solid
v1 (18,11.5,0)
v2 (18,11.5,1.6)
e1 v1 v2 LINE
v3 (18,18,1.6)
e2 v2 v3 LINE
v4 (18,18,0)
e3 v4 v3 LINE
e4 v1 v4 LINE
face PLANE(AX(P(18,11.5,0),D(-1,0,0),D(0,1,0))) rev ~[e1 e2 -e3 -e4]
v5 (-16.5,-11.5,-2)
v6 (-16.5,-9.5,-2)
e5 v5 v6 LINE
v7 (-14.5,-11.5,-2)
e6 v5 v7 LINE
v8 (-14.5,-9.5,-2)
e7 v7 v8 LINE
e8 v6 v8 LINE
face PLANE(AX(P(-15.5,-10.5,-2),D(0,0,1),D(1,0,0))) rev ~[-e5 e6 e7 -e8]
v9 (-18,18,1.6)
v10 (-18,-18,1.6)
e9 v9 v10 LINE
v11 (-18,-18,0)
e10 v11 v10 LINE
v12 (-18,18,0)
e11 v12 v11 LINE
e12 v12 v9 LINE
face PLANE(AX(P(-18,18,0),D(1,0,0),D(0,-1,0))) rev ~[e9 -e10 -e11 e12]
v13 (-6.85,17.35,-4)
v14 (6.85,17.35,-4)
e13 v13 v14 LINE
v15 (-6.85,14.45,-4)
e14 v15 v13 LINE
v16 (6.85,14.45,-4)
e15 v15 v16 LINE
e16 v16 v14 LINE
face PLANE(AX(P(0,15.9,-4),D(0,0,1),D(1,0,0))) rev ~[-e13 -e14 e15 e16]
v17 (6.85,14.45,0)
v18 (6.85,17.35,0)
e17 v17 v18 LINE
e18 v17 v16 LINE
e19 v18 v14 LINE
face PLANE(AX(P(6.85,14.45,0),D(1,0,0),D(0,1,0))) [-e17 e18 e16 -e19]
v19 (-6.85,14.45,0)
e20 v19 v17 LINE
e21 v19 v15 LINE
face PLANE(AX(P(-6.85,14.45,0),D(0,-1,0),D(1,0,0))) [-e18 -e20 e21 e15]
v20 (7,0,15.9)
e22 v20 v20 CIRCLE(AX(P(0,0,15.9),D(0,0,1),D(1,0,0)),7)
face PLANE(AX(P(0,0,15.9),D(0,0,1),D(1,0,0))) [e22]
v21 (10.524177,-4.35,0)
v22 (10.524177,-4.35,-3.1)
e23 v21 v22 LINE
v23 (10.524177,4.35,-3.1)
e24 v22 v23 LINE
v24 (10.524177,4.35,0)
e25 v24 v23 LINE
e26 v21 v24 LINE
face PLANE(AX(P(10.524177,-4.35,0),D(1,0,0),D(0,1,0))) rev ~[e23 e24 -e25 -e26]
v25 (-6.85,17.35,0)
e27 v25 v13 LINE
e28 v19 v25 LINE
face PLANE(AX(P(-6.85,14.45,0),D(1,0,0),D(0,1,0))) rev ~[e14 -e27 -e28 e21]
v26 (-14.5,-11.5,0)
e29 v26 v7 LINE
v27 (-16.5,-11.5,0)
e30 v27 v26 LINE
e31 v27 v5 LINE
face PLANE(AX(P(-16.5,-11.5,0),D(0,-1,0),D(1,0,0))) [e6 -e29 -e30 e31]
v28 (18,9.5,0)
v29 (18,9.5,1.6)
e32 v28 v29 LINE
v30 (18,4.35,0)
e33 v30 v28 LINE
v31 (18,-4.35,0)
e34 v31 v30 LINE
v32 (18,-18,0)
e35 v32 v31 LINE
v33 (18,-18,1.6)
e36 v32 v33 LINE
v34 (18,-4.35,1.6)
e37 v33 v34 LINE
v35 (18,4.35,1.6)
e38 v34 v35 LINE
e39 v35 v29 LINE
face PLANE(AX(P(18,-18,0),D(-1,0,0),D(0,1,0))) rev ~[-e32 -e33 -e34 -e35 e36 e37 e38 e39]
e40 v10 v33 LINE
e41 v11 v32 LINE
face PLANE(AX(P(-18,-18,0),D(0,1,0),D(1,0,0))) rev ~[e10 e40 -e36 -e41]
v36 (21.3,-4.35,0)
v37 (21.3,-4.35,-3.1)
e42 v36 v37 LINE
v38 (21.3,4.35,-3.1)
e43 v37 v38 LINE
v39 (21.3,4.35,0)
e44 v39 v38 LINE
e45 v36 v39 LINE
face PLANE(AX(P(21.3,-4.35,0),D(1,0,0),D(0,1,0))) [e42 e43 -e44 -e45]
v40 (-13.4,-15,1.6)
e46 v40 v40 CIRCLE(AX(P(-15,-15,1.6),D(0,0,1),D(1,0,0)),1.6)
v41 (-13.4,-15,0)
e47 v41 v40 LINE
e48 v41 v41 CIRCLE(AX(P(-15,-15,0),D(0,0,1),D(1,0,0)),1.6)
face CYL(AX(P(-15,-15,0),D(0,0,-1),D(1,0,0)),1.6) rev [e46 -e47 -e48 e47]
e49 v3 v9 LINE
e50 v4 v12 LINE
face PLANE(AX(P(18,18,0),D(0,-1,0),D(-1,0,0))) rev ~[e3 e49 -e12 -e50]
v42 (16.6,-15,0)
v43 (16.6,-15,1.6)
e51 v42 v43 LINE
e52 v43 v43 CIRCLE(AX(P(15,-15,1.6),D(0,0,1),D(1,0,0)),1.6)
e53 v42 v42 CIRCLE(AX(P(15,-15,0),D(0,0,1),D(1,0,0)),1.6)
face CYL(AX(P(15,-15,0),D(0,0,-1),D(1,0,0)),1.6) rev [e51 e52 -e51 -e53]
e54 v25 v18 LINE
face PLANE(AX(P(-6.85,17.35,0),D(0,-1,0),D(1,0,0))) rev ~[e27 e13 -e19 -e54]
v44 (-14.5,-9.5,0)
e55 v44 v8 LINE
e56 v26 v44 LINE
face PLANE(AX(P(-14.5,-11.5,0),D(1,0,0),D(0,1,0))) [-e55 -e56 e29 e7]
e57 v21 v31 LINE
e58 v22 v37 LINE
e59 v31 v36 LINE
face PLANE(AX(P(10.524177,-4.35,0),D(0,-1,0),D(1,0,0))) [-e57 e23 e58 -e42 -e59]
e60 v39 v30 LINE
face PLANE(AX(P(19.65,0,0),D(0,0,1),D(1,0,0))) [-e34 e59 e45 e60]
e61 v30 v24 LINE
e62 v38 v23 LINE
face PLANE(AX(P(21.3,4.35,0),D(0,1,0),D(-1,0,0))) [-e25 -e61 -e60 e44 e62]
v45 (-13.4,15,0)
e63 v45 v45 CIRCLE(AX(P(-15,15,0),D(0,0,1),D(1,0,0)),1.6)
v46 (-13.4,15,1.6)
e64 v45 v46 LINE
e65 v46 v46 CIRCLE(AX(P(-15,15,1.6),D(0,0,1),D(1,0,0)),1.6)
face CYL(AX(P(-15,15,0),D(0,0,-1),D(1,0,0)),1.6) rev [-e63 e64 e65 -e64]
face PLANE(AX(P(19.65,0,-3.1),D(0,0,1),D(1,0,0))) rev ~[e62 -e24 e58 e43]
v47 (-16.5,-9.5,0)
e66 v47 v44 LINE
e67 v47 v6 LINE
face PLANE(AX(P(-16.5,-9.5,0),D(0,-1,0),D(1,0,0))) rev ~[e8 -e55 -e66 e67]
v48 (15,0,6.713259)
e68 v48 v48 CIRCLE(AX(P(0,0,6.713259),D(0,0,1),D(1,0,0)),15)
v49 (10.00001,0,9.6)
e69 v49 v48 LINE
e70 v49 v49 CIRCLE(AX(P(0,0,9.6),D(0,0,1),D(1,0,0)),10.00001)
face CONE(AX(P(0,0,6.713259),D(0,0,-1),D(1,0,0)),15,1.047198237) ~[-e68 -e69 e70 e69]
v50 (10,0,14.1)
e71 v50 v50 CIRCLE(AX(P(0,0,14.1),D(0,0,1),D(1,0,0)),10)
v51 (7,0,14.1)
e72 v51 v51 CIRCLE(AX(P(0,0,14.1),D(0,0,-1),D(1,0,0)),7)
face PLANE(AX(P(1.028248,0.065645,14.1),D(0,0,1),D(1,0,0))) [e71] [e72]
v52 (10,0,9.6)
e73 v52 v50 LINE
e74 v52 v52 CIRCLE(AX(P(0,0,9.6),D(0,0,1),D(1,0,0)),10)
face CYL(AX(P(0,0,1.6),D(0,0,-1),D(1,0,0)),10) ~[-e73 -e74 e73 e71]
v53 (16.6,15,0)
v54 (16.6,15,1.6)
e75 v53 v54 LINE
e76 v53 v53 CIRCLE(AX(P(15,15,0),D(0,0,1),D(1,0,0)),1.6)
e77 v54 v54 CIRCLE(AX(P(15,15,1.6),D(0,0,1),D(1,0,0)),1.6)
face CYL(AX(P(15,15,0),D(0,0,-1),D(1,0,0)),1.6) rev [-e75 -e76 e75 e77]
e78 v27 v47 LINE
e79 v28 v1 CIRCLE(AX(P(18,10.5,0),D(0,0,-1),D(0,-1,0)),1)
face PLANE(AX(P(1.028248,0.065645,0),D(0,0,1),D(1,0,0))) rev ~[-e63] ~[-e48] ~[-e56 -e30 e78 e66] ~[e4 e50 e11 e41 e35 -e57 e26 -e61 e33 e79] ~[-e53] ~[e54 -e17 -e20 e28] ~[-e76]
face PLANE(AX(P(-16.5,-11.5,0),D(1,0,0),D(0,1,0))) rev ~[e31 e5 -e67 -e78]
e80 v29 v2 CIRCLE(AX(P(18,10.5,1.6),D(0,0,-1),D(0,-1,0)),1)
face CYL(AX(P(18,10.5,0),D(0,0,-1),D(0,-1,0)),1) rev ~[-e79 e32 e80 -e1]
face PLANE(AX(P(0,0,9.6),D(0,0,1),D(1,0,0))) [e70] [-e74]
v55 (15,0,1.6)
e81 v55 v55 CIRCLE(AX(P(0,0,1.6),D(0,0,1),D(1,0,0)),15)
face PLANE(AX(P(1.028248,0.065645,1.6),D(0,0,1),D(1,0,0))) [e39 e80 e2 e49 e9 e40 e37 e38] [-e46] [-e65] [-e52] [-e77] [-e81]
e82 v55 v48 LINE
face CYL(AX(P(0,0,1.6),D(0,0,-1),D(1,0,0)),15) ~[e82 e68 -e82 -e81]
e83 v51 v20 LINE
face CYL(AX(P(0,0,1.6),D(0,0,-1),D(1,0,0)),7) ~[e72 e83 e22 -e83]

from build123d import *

# Parameters (mm, degrees)
F0_R     = 1.6
F0_W     = 2
F0_H     = 2
F0_W_2   = 13.7
F0_H_2   = 2.9
F0_W_3   = 7.4758231461
F0_H_3   = 8.7
F1_DEPTH = 1.6
F2_DEPTH = 4
F0_W_4   = 3.3
F3_DEPTH = 3.1
F4_DEPTH = 2
F5_R     = 15
F5_R_2   = 10
F6_DEPTH = 8
F7_DEPTH = 12.5
F8_SIZE2 = 2.886741
F8_SIZE  = 4.99999
F5_R_3   = 7
F9_DEPTH = 14.3


# Not quite as in the source:
# - a fillet or chamfer is up to 0.001 mm smaller than in the source, because OpenCascade refuses the exact size


with BuildPart() as f1:
    # F0 (on Top) → F1 (new body)
    with BuildSketch(Plane.XY):
        with BuildLine():
            Line((-18, -18), (18, -18))
            Line((18, -18), (18, -4.35))
            Line((18, -4.35), (10.5241768539, -4.35))
            Line((10.5241768539, -4.35), (10.5241768539, 4.35))
            Line((10.5241768539, 4.35), (18, 4.35))
            Line((18, 4.35), (18, 9.5))
            ThreePointArc((18, 9.5), (17, 10.5), (18, 11.5))
            Line((18, 11.5), (18, 18))
            Line((18, 18), (-18, 18))
            Line((-18, 18), (-18, -18))
        make_face()
        with Locations((-15, -15)):
            Circle(F0_R, mode=Mode.SUBTRACT)
        with Locations((-15.5, -10.5)):
            Rectangle(F0_W, F0_H, mode=Mode.SUBTRACT)
        with Locations((15, -15)):
            Circle(F0_R, mode=Mode.SUBTRACT)
        with Locations((-15, 15)):
            Circle(F0_R, mode=Mode.SUBTRACT)
        with Locations((0, 15.9)):
            Rectangle(F0_W_2, F0_H_2, mode=Mode.SUBTRACT)
        with Locations((15, 15)):
            Circle(F0_R, mode=Mode.SUBTRACT)
        with Locations((0, 15.9)):
            Rectangle(F0_W_2, F0_H_2)
        with Locations((-15.5, -10.5)):
            Rectangle(F0_W, F0_H)
        with Locations((14.2620884269, 0)):
            Rectangle(F0_W_3, F0_H_3)
    extrude(amount=F1_DEPTH)

    # F0 (on Top) → F2 (join)
    with BuildSketch(Plane.XY):
        with Locations((0, 15.9)):
            Rectangle(F0_W_2, F0_H_2)
    extrude(amount=-F2_DEPTH)

    # F0 (on Top) → F3 (join)
    with BuildSketch(Plane.XY):
        with Locations((19.65, 0)):
            Rectangle(F0_W_4, F0_H_3)
        with Locations((14.2620884269, 0)):
            Rectangle(F0_W_3, F0_H_3)
    extrude(amount=-F3_DEPTH)

    # F0 (on Top) → F4 (join)
    with BuildSketch(Plane.XY):
        with Locations((-15.5, -10.5)):
            Rectangle(F0_W, F0_H)
    extrude(amount=-F4_DEPTH)

    # F5 (on face) → F6 (join)
    with BuildSketch(Plane.XY.offset(1.6)):
        Circle(F5_R)
        Circle(F5_R_2, mode=Mode.SUBTRACT)
    extrude(amount=F6_DEPTH)

    # F7 (add): a face of the model
    f7_faces = [f1.faces().sort_by_distance(p)[0] for p in [
        (0, 0, 1.6),
    ]]
    extrude(f7_faces, amount=F7_DEPTH)

    # F8 (size 5 and 2.8867513459 in the source; OpenCascade refuses exactly that, so slightly less here)
    f8_edges = [f1.edges().sort_by_distance(p)[0] for p in [
        (-15, 0, 9.6),
    ]]
    f8_side = f1.faces().sort_by_distance((-14.575736, 0, 9.6))[0]
    chamfer(f8_edges, length=F8_SIZE, length2=F8_SIZE2, reference=f8_side)

    # F5 (on face) → F9 (join)
    with BuildSketch(Plane.XY.offset(1.6)):
        Circle(F5_R_3)
    extrude(amount=F9_DEPTH)


solid = f1.part
